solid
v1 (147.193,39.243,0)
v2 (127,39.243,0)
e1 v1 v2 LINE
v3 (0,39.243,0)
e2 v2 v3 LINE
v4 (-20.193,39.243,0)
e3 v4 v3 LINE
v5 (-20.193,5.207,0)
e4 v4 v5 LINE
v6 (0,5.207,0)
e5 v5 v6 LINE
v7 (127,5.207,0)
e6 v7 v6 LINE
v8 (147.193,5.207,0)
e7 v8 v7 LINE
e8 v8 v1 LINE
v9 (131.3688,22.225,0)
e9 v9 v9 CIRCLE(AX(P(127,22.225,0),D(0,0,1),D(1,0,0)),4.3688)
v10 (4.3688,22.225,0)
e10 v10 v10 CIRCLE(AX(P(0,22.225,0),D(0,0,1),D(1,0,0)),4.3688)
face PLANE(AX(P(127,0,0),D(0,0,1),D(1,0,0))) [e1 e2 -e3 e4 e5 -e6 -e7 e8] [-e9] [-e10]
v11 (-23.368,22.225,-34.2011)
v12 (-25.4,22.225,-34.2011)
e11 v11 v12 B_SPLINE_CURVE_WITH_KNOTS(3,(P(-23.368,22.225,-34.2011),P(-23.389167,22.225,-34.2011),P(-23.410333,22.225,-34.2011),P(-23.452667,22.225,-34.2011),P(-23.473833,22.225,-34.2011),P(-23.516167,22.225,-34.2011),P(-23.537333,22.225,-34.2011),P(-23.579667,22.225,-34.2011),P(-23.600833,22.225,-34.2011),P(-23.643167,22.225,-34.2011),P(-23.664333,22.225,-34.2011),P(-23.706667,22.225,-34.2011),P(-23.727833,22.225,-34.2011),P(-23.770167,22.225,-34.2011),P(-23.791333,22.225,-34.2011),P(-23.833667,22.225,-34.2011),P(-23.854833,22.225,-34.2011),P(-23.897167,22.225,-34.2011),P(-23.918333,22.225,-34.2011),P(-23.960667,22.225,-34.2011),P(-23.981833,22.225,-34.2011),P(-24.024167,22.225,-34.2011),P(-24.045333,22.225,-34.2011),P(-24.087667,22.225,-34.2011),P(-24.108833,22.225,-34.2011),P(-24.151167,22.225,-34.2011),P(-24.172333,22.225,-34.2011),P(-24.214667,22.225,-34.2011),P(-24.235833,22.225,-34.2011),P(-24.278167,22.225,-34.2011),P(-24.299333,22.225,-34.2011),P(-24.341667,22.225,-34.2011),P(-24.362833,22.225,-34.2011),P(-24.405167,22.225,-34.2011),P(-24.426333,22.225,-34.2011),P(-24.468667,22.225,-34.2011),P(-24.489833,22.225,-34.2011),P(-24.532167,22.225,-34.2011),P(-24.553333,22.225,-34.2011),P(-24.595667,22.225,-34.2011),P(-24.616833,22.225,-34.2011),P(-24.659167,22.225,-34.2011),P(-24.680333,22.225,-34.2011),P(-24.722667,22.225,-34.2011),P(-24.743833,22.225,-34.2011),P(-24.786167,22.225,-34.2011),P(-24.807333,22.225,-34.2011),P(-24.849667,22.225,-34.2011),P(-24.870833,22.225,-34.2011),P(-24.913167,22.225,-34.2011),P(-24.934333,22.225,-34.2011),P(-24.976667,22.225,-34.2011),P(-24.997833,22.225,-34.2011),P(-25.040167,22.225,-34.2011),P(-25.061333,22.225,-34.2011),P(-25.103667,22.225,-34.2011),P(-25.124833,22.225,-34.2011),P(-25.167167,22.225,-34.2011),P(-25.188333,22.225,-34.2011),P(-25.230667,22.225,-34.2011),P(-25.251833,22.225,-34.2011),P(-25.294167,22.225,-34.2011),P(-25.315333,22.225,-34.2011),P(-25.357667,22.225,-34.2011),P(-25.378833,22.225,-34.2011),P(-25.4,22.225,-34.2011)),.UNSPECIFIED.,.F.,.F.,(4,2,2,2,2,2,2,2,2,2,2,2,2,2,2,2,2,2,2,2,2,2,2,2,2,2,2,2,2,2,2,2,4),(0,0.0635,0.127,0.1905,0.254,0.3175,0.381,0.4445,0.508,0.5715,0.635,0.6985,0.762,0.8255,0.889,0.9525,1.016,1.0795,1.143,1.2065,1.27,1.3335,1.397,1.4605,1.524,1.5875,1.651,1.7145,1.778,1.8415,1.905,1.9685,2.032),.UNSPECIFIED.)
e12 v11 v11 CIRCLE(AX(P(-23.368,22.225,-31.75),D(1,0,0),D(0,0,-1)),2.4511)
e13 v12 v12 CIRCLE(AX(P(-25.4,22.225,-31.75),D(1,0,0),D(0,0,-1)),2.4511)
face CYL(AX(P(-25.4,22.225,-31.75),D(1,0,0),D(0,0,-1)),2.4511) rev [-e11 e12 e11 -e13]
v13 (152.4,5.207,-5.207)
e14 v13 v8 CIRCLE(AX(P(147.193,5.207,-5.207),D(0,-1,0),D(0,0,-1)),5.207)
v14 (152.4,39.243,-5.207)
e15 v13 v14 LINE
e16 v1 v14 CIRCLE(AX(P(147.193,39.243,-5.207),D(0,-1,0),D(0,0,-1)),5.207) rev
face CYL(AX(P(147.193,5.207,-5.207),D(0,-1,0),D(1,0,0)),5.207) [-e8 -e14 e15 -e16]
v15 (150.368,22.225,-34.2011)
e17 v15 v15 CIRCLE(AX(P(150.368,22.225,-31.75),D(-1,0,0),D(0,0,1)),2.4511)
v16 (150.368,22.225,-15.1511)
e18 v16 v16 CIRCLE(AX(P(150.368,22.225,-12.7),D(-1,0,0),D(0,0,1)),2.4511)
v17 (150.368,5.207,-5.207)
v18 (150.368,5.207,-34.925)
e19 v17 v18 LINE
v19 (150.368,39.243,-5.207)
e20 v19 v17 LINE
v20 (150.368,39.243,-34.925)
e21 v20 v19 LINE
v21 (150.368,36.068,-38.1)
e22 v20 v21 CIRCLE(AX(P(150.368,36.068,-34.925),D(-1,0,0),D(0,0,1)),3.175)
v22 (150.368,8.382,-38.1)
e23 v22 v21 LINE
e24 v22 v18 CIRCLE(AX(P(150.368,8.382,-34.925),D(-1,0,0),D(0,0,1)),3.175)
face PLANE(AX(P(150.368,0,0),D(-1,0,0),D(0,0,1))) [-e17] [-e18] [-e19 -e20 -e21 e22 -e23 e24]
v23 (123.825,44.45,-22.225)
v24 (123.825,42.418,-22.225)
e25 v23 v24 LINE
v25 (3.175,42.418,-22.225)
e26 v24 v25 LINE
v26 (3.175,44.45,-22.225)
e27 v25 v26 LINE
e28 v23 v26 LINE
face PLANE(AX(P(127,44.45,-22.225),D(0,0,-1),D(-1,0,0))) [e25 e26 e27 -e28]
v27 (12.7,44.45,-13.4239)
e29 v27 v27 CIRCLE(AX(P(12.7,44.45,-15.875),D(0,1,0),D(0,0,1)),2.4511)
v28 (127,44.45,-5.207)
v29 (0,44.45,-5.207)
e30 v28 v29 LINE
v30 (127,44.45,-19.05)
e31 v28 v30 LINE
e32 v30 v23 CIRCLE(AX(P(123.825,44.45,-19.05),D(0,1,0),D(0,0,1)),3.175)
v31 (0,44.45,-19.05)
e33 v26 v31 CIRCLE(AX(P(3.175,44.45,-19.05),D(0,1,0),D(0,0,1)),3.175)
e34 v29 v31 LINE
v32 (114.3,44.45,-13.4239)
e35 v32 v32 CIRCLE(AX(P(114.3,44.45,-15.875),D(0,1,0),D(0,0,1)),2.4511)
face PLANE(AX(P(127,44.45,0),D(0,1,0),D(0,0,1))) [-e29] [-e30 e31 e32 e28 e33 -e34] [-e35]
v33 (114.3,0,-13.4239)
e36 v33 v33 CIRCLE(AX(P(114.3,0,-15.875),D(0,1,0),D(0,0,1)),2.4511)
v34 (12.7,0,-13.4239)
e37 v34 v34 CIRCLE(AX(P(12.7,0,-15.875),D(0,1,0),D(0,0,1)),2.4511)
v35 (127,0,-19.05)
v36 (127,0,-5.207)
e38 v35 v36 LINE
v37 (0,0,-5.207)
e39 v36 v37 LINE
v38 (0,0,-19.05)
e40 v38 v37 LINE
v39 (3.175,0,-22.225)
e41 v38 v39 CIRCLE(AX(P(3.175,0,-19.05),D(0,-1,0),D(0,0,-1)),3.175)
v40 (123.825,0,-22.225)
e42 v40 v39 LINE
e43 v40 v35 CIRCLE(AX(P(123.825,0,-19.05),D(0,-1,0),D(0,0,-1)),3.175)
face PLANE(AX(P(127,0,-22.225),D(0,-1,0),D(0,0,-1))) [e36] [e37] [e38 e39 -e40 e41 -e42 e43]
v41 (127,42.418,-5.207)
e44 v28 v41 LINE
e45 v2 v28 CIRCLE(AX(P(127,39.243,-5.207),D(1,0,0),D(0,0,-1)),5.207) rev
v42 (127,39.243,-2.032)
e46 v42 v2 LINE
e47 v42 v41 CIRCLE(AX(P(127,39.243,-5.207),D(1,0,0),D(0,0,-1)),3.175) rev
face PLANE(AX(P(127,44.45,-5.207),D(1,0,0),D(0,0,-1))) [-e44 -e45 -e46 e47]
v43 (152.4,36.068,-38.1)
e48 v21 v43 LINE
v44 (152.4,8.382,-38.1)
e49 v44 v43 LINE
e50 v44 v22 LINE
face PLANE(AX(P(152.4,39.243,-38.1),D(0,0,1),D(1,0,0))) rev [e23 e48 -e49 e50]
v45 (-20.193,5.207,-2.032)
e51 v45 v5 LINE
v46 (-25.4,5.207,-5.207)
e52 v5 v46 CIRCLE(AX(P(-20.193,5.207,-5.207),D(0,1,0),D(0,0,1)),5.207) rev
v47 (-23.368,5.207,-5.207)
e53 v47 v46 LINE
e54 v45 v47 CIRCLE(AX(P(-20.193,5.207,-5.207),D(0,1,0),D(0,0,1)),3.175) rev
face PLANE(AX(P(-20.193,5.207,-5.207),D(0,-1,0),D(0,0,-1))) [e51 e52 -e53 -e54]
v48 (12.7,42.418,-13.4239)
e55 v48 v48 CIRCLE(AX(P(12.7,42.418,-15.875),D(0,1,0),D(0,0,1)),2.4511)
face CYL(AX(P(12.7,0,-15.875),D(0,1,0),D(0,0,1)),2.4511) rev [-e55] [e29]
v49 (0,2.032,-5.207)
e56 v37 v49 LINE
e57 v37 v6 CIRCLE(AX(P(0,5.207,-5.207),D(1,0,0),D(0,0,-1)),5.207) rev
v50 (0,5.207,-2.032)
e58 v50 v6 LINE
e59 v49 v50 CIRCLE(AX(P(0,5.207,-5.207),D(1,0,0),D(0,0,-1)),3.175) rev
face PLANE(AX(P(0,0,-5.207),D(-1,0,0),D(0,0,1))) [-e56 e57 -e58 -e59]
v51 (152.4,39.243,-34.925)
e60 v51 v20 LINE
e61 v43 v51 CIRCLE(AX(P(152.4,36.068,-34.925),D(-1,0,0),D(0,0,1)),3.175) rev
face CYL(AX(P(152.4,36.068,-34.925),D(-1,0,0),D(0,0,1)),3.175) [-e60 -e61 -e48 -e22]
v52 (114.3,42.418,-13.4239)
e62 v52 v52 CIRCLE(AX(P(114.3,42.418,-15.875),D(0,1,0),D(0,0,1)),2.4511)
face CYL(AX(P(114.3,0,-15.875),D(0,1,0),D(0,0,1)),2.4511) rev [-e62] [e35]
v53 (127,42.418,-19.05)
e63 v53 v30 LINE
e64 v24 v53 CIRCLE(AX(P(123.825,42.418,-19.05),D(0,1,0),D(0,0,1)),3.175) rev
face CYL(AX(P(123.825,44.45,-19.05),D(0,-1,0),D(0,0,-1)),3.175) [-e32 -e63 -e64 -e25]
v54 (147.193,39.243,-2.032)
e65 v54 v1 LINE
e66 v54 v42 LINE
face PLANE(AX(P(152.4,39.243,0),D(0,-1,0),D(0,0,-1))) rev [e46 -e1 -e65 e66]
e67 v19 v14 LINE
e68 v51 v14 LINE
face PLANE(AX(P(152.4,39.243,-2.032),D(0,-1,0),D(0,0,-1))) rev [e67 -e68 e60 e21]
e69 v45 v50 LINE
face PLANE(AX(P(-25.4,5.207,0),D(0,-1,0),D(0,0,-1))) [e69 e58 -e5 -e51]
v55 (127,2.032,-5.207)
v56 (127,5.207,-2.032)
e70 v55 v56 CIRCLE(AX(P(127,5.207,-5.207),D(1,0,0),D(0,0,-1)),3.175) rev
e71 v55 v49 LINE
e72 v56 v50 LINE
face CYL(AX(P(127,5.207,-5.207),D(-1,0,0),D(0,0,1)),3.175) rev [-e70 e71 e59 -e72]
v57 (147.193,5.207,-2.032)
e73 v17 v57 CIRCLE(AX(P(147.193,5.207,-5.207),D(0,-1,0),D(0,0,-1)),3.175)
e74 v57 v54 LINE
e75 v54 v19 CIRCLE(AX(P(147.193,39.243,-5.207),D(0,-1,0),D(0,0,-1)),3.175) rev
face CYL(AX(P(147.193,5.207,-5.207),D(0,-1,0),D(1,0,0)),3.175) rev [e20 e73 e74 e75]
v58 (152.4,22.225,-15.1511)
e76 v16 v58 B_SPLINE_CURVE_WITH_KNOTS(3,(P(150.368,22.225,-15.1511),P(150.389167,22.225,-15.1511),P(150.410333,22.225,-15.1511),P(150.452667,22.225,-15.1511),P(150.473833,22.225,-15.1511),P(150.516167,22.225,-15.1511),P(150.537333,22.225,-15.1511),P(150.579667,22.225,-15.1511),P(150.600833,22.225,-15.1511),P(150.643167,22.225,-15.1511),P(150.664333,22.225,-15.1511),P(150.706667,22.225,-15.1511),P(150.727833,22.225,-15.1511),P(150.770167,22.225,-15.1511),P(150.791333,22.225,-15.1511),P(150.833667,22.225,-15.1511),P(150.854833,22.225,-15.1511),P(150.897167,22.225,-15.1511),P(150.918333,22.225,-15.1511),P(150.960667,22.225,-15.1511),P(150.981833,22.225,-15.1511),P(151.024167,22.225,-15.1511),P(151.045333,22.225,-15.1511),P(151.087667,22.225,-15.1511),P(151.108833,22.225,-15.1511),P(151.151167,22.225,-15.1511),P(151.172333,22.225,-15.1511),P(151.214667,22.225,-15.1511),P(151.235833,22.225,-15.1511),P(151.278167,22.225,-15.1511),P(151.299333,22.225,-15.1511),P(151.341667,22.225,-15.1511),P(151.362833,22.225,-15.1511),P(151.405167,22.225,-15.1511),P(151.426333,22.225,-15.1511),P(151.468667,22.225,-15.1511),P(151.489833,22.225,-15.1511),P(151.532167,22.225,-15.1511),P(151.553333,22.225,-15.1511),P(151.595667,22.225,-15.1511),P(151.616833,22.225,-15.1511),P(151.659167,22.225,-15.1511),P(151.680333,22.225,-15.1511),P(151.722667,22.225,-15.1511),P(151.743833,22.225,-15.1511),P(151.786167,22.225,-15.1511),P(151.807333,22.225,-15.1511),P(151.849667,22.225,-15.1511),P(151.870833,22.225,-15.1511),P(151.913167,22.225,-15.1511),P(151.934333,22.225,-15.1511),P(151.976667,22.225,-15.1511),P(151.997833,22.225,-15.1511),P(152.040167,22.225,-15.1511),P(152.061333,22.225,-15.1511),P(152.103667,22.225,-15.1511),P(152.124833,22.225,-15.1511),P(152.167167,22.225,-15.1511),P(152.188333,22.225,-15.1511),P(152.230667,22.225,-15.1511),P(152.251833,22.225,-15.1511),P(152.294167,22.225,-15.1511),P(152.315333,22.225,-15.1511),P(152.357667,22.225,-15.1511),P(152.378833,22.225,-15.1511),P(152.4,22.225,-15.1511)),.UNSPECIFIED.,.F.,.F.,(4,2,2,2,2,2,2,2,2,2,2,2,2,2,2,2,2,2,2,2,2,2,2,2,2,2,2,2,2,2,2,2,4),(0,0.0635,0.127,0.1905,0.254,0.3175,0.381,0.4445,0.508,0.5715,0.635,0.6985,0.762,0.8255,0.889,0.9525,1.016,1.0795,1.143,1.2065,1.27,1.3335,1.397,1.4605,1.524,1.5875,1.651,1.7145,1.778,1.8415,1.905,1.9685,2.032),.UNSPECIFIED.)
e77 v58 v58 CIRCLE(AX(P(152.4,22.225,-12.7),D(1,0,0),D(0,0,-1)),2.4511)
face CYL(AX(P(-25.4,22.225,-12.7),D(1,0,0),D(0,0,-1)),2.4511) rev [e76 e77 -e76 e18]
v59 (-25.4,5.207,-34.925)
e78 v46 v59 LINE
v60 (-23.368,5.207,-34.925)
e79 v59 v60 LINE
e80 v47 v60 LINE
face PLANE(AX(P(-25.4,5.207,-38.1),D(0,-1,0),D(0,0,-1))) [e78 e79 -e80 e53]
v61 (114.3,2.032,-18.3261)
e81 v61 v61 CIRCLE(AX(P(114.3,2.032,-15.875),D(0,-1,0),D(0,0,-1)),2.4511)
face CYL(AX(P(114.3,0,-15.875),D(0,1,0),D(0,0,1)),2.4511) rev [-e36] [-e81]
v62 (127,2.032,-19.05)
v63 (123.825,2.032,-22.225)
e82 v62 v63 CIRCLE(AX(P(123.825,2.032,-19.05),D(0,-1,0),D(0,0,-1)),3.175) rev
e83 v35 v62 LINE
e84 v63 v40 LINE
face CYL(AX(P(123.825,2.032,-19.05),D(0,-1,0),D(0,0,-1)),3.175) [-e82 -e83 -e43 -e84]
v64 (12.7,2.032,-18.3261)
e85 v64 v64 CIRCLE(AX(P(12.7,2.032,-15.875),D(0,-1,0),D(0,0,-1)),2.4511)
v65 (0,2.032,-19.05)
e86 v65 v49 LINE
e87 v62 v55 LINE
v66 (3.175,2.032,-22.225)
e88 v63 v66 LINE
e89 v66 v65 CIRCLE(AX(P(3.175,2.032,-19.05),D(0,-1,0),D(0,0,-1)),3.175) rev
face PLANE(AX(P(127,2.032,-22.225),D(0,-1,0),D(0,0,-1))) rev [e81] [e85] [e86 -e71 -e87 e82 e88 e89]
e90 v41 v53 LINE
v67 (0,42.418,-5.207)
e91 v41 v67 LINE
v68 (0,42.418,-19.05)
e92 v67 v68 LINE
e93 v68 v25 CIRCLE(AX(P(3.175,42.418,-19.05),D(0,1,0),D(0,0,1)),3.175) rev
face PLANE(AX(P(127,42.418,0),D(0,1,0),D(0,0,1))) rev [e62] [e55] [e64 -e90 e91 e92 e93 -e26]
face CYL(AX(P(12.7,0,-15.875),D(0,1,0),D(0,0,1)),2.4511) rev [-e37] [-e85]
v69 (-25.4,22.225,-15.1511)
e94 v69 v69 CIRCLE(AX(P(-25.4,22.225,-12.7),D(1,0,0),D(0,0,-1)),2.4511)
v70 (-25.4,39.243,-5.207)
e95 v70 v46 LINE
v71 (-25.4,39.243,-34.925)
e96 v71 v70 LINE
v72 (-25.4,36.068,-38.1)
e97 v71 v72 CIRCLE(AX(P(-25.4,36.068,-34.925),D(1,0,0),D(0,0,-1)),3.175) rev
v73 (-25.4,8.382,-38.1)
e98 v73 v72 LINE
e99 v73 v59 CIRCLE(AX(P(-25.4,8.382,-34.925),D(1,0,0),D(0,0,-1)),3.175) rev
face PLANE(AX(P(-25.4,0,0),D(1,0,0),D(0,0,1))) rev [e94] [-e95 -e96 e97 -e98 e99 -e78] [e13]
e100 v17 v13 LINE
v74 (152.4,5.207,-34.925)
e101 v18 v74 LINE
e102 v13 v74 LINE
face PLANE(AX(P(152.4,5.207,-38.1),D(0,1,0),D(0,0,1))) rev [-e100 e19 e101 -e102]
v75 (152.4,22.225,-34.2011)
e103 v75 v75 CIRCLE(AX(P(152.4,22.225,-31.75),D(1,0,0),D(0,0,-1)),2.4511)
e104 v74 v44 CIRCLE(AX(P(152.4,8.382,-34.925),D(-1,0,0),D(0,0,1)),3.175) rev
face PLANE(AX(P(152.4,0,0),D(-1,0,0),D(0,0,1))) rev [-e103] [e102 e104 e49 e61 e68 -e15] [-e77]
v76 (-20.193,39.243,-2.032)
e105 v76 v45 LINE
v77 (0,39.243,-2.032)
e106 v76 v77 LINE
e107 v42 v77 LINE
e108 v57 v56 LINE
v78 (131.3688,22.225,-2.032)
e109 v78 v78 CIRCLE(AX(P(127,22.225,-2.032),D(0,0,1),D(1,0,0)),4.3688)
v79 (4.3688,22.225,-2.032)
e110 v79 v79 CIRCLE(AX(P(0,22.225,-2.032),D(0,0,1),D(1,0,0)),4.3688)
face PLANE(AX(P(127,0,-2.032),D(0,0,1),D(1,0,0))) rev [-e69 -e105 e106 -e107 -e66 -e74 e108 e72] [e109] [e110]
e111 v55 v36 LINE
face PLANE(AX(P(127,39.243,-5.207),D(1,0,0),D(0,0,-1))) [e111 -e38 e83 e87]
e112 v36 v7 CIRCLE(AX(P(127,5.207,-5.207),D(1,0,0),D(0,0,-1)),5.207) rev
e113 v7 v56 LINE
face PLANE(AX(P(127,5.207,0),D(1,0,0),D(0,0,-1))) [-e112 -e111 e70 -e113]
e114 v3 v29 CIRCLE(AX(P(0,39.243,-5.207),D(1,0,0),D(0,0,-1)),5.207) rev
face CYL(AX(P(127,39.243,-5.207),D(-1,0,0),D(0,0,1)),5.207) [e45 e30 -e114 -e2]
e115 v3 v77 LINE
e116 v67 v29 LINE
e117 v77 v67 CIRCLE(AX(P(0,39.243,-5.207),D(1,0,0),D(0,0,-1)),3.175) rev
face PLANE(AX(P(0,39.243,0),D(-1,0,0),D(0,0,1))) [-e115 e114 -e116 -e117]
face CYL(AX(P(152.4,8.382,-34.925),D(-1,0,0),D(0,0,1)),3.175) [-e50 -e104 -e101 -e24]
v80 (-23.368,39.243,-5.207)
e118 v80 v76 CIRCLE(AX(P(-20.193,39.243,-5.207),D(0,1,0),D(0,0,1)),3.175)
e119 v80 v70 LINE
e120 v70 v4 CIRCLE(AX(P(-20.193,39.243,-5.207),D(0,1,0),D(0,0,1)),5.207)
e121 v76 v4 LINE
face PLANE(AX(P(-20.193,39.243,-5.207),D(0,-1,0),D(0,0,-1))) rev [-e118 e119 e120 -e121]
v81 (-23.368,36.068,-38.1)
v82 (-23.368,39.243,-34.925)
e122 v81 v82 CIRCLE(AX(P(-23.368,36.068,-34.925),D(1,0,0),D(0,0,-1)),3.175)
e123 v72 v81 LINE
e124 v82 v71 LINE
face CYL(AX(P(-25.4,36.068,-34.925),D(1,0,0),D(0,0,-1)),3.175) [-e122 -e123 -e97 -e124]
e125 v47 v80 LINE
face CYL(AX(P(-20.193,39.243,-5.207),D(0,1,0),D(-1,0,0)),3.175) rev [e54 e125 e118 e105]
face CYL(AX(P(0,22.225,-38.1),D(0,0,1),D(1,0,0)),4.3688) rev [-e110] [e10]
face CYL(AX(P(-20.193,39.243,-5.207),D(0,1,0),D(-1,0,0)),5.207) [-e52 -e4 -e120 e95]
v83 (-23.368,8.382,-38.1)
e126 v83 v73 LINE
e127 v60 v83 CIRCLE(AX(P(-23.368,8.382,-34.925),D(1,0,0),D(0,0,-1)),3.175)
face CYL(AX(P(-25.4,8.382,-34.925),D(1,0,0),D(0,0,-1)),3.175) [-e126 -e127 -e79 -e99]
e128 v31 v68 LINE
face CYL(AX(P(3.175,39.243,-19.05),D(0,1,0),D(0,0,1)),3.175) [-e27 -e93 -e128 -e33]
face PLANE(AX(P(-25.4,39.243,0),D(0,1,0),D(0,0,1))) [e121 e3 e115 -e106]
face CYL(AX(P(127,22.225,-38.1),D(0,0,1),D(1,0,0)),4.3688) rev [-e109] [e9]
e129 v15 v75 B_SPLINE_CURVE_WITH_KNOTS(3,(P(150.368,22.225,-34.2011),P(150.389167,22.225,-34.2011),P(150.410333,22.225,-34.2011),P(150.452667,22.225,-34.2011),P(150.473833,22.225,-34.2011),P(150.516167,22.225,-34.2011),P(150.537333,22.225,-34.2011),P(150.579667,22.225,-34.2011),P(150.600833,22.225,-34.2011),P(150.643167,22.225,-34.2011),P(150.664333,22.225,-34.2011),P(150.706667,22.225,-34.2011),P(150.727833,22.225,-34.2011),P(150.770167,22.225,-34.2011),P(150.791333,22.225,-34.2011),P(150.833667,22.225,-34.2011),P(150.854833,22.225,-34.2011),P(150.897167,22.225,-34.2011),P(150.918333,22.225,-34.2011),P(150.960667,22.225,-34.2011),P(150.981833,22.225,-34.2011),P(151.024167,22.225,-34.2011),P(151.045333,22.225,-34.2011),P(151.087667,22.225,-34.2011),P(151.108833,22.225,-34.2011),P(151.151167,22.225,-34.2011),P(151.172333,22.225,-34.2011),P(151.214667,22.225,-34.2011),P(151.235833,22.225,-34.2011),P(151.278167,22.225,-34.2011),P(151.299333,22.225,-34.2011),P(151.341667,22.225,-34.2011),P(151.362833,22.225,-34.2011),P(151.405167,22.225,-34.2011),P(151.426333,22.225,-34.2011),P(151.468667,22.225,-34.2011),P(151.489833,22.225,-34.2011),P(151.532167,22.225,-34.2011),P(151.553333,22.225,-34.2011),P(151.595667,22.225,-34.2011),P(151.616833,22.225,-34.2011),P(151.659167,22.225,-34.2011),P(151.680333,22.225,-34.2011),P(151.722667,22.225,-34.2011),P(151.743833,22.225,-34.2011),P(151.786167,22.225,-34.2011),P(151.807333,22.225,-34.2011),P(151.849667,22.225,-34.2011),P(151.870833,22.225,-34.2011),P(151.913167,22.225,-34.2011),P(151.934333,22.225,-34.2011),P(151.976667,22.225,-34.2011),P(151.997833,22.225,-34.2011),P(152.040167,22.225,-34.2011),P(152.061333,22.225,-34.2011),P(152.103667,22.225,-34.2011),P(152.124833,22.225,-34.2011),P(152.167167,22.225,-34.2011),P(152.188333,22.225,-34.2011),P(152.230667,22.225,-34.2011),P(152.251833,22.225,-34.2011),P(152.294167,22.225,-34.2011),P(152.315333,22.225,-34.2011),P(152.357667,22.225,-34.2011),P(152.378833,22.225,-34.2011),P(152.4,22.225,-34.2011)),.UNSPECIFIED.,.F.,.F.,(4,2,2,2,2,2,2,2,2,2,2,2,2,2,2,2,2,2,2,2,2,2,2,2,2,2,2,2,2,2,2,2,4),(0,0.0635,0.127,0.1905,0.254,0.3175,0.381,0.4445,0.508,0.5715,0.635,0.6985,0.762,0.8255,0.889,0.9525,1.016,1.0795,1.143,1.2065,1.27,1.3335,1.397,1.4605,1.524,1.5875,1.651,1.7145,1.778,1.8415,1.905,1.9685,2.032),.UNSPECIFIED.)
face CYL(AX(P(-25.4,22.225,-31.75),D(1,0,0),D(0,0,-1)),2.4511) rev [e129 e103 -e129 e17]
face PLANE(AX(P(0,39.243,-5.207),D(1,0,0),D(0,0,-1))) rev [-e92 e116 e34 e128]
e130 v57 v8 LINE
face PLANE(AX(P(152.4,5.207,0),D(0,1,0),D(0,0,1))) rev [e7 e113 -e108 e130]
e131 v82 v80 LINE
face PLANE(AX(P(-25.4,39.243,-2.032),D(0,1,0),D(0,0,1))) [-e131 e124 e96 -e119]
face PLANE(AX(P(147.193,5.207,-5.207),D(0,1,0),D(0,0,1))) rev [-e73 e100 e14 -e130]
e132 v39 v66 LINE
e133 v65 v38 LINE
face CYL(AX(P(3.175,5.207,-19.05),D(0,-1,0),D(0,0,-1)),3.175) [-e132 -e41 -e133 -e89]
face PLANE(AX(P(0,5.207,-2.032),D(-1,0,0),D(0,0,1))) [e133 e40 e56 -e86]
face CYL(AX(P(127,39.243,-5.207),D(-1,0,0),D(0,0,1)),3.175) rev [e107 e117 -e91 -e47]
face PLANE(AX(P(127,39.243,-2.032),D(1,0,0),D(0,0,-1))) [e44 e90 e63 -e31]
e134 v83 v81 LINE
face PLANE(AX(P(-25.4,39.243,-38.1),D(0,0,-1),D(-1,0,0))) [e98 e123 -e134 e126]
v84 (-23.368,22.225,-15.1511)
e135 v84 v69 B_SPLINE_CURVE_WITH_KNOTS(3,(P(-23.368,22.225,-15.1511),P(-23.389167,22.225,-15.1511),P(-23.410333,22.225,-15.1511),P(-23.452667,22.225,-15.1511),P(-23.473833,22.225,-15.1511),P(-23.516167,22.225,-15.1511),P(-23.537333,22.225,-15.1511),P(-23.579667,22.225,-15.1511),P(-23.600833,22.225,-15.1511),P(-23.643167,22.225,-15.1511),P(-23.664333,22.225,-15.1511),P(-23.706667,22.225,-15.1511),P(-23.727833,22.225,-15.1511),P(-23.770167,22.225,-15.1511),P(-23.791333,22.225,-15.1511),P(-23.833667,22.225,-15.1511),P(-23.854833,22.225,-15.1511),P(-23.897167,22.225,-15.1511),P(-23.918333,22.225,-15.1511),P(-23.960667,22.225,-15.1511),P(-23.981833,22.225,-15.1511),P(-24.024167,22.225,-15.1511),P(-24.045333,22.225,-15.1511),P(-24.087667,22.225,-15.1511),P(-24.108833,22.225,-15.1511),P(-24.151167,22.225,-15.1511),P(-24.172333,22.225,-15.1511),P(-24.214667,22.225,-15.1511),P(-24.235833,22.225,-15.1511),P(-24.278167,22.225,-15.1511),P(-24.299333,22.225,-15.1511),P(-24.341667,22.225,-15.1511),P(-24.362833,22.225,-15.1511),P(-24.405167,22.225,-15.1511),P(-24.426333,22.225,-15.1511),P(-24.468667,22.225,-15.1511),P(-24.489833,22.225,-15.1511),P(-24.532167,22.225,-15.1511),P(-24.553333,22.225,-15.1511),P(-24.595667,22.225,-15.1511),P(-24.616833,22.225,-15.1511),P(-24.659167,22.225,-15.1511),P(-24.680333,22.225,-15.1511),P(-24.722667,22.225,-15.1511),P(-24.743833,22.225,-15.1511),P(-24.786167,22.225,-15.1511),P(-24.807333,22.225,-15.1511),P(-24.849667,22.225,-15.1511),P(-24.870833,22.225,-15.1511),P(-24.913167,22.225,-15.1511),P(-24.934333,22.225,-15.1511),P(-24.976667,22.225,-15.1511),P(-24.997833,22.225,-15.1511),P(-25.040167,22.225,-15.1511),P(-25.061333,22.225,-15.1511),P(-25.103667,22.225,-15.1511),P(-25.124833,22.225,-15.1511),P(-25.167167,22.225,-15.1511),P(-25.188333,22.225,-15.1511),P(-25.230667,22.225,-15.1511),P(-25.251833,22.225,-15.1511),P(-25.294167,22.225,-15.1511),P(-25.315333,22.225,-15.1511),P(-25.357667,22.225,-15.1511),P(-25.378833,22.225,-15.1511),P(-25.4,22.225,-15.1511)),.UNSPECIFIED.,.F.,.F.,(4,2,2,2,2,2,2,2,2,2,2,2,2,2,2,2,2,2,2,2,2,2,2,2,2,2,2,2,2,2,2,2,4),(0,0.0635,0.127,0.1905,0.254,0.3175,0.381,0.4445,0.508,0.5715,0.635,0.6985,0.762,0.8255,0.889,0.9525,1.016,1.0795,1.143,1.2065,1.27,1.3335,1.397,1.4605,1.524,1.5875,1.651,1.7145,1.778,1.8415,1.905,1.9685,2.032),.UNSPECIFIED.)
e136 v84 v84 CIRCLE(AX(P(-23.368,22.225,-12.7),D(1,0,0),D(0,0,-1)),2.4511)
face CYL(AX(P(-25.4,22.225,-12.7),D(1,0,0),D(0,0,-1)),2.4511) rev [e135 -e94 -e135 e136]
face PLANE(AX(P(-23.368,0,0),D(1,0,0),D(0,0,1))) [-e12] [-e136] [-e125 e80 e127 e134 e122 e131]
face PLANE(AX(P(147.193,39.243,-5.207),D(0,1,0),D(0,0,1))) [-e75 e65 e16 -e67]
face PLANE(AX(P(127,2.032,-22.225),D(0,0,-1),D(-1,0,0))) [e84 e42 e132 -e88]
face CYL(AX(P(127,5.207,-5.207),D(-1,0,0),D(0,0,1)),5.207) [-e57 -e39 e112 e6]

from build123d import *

# Parameters (mm, degrees)
BASE_FLANGE1_DEPTH           = 127
SKETCH6_W                    = 2.032
SKETCH6_H                    = 34.036
BOSS_EXTRUDE1_DEPTH          = 25.4
EDGE_FLANGE1_STRIP_W         = 14.478
EDGE_FLANGE1_STRIP_H         = 2.032
EDGE_FLANGE1_STRIP_CUT_DEPTH = 34.036
EDGE_FLANGE1_DEPTH           = 34.036
SKETCH10_R                   = 2.4511
CUT_EXTRUDE1_DEPTH           = 188.190417757
SKETCH11_R                   = 2.4511
CUT_EXTRUDE2_DEPTH           = 164.257993679
SKETCH12_R                   = 4.3688
CUT_EXTRUDE3_DEPTH           = 164.257993679
FILLET1_R                    = 3.175


# Sheet-metal steps are written as plain solids
with BuildPart() as part:
    # Sketch1 → Base-Flange1 (new body)
    with BuildSketch(Plane(origin=(0, 0, 0), x_dir=(0, 0, -1), z_dir=(1, 0, 0))):
        with BuildLine():
            Line((22.225, 0), (5.207, 0))
            ThreePointArc((5.207, 0), (1.52509499, 1.52509499), (0, 5.207))
            Line((0, 5.207), (0, 39.243))
            ThreePointArc((0, 39.243), (1.52509499, 42.92490501), (5.207, 44.45))
            Line((5.207, 44.45), (22.225, 44.45))
            Line((22.225, 44.45), (22.225, 42.418))
            Line((22.225, 42.418), (5.207, 42.418))
            ThreePointArc((5.207, 42.418), (2.96193597, 41.48806403), (2.032, 39.243))
            Line((2.032, 39.243), (2.032, 5.207))
            ThreePointArc((2.032, 5.207), (2.96193597, 2.96193597), (5.207, 2.032))
            Line((5.207, 2.032), (22.225, 2.032))
            Line((22.225, 2.032), (22.225, 0))
        make_face()
    extrude(amount=BASE_FLANGE1_DEPTH)

    # Sketch6 → Boss-Extrude1 (add)
    with BuildSketch(Plane(origin=(127, 0, 0), x_dir=(0, 0, -1), z_dir=(1, 0, 0))):
        with Locations((1.016, 22.225)):
            Rectangle(SKETCH6_W, SKETCH6_H)
    boss_extrude1 = extrude(amount=BOSS_EXTRUDE1_DEPTH)

    # Edge-Flange1 strip (across the edge) → Edge-Flange1 strip cut (cut)
    with BuildSketch(Plane(origin=(152.4, 39.243, -2.032), x_dir=(-1, 0, 0), z_dir=(0, -1, 0))):
        with Locations((-2.032, -1.016)):
            Rectangle(EDGE_FLANGE1_STRIP_W, EDGE_FLANGE1_STRIP_H)
    edge_flange1_strip_cut = extrude(amount=EDGE_FLANGE1_STRIP_CUT_DEPTH, mode=Mode.SUBTRACT)

    # Edge-Flange1 section (across the edge) → Edge-Flange1 (add)
    with BuildSketch(Plane(origin=(152.4, 39.243, -2.032), x_dir=(-1, 0, 0), z_dir=(0, -1, 0))):
        with BuildLine():
            Line((0, 3.175), (0, 36.068))
            Line((0, 36.068), (2.032, 36.068))
            Line((2.032, 36.068), (2.032, 3.175))
            ThreePointArc((2.032, 3.175), (2.96193597, 0.92993597), (5.207, 0))
            Line((5.207, 0), (5.207, -2.032))
            ThreePointArc((5.207, -2.032), (1.52509499, -0.50690501), (0, 3.175))
        make_face()
    edge_flange1 = extrude(amount=EDGE_FLANGE1_DEPTH)

    # Mirror1: Boss-Extrude1, Edge-Flange1 strip cut, Edge-Flange1 across plane
    add(boss_extrude1.mirror(Plane(origin=(63.5, 0, 0), x_dir=(0, 0, 1), z_dir=(1, 0, 0))))
    add(edge_flange1_strip_cut.mirror(Plane(origin=(63.5, 0, 0), x_dir=(0, 0, 1), z_dir=(1, 0, 0))), mode=Mode.SUBTRACT)
    add(edge_flange1.mirror(Plane(origin=(63.5, 0, 0), x_dir=(0, 0, 1), z_dir=(1, 0, 0))))

    # Sketch10 → Cut-Extrude1 (cut, through all)
    with BuildSketch(Plane(origin=(152.4, 0, 0), x_dir=(0, 0, -1), z_dir=(1, 0, 0))):
        with Locations((12.7, 22.225)):
            Circle(SKETCH10_R)
        with Locations((31.75, 22.225)):
            Circle(SKETCH10_R)
    extrude(amount=-CUT_EXTRUDE1_DEPTH, mode=Mode.SUBTRACT)

    # Sketch11 → Cut-Extrude2 (cut, through all)
    with BuildSketch(Plane(origin=(0, 44.45, 0), x_dir=(1, 0, 0), z_dir=(0, 1, 0))):
        with Locations(Location((12.7, 15.875, 0), (0, 0, 270))):
            Circle(SKETCH11_R)
        with Locations(Location((114.3, 15.875, 0), (0, 0, 270))):
            Circle(SKETCH11_R)
    extrude(amount=-CUT_EXTRUDE2_DEPTH, mode=Mode.SUBTRACT)

    # Sketch12 → Cut-Extrude3 (cut, through all)
    with BuildSketch(Plane.XY):
        with Locations((0, 22.225)):
            Circle(SKETCH12_R)
        with Locations((127, 22.225)):
            Circle(SKETCH12_R)
    extrude(amount=-CUT_EXTRUDE3_DEPTH, mode=Mode.SUBTRACT)

    # Fillet1
    fillet1_edges = [part.edges().sort_by_distance(p)[0] for p in [
        (-24.384, 5.207, -38.1),
        (0, 1.016, -22.225),
        (-24.384, 39.243, -38.1),
        (0, 43.434, -22.225),
        (127, 1.016, -22.225),
        (151.384, 39.243, -38.1),
        (151.384, 5.207, -38.1),
        (127, 43.434, -22.225),
    ]]
    fillet(fillet1_edges, radius=FILLET1_R)


solid = part.part
